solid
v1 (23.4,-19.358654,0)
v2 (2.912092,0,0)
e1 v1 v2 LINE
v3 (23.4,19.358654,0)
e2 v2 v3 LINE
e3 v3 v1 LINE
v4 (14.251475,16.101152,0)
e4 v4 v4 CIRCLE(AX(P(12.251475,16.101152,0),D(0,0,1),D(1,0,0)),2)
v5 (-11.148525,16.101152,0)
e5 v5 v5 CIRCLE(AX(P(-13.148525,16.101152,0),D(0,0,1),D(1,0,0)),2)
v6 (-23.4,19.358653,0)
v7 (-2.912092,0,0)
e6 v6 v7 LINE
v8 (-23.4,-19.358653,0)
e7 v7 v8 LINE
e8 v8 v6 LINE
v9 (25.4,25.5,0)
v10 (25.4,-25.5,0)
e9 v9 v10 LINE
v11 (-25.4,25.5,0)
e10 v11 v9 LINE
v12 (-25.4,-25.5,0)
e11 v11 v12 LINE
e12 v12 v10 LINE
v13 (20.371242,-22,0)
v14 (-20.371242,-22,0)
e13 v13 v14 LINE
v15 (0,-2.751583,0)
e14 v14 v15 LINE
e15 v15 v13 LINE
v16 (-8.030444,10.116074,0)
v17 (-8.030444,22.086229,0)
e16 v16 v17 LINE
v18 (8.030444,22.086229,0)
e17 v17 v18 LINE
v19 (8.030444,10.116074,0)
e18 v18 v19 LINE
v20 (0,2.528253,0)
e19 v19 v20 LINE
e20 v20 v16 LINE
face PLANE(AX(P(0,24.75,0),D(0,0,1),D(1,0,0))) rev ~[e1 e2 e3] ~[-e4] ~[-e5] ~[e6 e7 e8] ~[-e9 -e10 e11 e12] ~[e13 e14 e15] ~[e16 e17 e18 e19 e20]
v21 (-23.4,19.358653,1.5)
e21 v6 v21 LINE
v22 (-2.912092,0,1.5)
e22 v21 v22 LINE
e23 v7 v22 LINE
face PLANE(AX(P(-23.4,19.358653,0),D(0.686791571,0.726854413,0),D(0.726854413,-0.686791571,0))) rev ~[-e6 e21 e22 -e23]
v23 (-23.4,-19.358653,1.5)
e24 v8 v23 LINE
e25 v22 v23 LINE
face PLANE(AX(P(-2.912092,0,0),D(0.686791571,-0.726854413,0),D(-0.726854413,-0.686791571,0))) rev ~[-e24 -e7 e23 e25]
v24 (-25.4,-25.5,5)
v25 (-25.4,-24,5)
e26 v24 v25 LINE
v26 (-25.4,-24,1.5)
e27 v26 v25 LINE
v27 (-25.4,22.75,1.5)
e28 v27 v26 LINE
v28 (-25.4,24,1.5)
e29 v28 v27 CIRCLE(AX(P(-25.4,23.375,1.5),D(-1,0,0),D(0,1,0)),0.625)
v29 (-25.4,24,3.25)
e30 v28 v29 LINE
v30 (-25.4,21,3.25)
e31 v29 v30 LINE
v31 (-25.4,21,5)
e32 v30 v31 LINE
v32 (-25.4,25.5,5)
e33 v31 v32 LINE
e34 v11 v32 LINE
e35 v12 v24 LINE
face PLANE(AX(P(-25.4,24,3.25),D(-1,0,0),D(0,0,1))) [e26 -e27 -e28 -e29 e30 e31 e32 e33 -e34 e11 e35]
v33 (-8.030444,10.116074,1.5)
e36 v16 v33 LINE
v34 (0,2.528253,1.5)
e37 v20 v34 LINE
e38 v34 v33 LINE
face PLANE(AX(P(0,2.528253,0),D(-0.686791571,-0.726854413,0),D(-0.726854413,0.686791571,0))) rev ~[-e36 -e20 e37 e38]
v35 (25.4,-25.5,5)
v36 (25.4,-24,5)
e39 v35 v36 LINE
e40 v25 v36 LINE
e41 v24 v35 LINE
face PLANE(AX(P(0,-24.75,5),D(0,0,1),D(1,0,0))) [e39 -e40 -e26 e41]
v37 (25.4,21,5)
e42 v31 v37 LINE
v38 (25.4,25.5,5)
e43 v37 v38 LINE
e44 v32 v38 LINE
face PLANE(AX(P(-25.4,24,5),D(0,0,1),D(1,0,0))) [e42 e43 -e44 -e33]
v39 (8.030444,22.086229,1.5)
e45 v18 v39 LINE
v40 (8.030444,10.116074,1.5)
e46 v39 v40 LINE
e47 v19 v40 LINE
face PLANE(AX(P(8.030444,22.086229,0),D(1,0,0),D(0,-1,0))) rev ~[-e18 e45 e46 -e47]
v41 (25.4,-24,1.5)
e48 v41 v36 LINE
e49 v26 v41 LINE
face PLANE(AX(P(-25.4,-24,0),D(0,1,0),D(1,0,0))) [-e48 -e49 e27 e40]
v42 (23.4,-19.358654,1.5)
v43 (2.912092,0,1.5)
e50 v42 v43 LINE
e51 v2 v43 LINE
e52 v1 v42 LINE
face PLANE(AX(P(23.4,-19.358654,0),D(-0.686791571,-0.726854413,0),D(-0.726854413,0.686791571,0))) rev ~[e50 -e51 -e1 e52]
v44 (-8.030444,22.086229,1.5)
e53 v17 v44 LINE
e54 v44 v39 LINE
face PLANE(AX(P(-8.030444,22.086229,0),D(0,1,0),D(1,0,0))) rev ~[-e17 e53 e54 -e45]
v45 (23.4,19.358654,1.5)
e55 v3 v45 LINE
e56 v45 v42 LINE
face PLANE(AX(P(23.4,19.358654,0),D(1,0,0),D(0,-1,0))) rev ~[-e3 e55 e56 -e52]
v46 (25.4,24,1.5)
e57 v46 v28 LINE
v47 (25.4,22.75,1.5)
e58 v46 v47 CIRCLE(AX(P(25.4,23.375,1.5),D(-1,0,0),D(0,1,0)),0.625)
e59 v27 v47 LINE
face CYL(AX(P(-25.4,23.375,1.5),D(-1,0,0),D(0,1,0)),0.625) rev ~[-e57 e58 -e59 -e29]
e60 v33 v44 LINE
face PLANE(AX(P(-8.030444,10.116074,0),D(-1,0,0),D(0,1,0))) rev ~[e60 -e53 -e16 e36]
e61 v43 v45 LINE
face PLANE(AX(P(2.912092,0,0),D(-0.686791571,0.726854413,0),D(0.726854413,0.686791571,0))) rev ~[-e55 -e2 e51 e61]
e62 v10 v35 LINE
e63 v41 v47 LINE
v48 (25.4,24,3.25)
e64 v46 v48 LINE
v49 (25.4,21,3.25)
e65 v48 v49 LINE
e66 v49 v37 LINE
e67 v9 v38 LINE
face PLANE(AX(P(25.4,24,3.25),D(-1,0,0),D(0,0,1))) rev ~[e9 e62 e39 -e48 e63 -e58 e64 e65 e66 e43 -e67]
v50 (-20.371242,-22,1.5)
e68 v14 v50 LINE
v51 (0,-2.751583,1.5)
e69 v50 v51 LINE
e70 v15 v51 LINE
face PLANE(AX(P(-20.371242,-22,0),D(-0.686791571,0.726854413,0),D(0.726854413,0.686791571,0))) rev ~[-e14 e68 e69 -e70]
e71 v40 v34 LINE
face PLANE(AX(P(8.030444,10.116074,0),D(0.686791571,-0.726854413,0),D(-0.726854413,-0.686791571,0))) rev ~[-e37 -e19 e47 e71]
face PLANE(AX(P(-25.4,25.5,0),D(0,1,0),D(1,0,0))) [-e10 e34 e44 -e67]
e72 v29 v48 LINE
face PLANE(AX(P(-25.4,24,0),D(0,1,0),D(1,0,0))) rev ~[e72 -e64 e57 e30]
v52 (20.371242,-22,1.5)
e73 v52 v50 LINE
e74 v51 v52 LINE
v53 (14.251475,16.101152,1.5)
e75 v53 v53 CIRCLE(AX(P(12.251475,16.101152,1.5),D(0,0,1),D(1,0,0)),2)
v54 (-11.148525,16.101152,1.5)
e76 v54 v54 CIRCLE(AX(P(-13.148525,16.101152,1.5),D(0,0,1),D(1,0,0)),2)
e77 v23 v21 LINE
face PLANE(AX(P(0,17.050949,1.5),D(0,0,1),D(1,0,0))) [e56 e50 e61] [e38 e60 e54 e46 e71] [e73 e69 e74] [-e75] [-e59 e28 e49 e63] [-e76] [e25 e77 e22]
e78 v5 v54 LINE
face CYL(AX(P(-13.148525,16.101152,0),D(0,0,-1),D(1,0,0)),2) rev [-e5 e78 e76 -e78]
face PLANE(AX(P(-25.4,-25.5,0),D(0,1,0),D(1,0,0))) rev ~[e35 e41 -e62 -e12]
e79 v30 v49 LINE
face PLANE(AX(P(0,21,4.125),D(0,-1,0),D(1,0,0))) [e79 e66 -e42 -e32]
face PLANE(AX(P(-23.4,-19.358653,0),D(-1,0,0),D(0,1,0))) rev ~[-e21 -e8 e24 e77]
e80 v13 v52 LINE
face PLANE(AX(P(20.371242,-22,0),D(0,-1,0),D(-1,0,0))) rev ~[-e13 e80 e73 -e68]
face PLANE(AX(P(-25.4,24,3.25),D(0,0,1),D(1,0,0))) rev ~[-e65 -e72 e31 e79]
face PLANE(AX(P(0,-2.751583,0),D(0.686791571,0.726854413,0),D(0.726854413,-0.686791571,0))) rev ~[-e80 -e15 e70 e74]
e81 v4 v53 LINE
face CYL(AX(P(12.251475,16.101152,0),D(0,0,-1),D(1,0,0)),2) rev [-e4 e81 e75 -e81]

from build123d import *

# Parameters (mm, degrees)
F0_R     = 2
F1_DEPTH = 1.5
F0_W     = 50.8
F0_H     = 1.5
F2_DEPTH = 5
F3_DEPTH = 5
F4_W     = 50.8
F4_H     = 1.75
F5_DEPTH = 3
F7_DEPTH = 50.801


with BuildPart() as f1:
    # F0 (on Top) → F1 (new body)
    with BuildSketch(Plane.XY):
        Polygon((25.4, 24), (-25.4, 24), (0, 0), align=None)
        Polygon((-8.0304443836, 10.1160742342), (-8.0304443836, 22.0862291753), (8.0304443836, 22.0862291753), (8.0304443836, 10.1160742342), (0, 2.5282527694), align=None, mode=Mode.SUBTRACT)
        with Locations((-13.1485247985, 16.1011517048)):
            Circle(F0_R, mode=Mode.SUBTRACT)
        with Locations((12.2514752015, 16.1011517048)):
            Circle(F0_R, mode=Mode.SUBTRACT)
        Polygon((0, 0), (-25.4, 24), (-25.4, -24), align=None)
        Polygon((-23.3999999466, 19.3586534352), (-2.9120917277, 0), (-23.3999999466, -19.3586534352), align=None, mode=Mode.SUBTRACT)
        Polygon((0, 0), (-25.4, -24), (25.4, -24), align=None)
        Polygon((20.3712416834, -22), (-20.3712416834, -22), (0, -2.7515826614), align=None, mode=Mode.SUBTRACT)
        Polygon((25.4, -24), (25.4, 24), (0, 0), align=None)
        Polygon((23.4, -19.3586535591), (2.91209165, 0), (23.4, 19.3586535591), align=None, mode=Mode.SUBTRACT)
    extrude(amount=F1_DEPTH)

    # F0 (on Top) → F2 (join)
    with BuildSketch(Plane.XY):
        with Locations((0, -24.75)):
            Rectangle(F0_W, F0_H)
    extrude(amount=F2_DEPTH)

    # F0 (on Top) → F3 (join)
    with BuildSketch(Plane.XY):
        with Locations((0, 24.75)):
            Rectangle(F0_W, F0_H)
    extrude(amount=F3_DEPTH)

    # F4 (on face) → F5 (join)
    with BuildSketch(Plane.XZ.offset(-24)):
        with Locations((0, 4.125)):
            Rectangle(F4_W, F4_H)
    extrude(amount=F5_DEPTH)

    # F6 (on face) → F7 (cut, through all)
    with BuildSketch(Plane(origin=(-25.4, 0, 0), x_dir=(0, -1, 0), z_dir=(-1, 0, 0))):
        with BuildLine():
            ThreePointArc((-24, 1.5), (-23.375, 0.875), (-22.75, 1.5))
            Line((-22.75, 1.5), (-24, 1.5))
        make_face()
    extrude(amount=-F7_DEPTH, mode=Mode.SUBTRACT)


solid = f1.part
